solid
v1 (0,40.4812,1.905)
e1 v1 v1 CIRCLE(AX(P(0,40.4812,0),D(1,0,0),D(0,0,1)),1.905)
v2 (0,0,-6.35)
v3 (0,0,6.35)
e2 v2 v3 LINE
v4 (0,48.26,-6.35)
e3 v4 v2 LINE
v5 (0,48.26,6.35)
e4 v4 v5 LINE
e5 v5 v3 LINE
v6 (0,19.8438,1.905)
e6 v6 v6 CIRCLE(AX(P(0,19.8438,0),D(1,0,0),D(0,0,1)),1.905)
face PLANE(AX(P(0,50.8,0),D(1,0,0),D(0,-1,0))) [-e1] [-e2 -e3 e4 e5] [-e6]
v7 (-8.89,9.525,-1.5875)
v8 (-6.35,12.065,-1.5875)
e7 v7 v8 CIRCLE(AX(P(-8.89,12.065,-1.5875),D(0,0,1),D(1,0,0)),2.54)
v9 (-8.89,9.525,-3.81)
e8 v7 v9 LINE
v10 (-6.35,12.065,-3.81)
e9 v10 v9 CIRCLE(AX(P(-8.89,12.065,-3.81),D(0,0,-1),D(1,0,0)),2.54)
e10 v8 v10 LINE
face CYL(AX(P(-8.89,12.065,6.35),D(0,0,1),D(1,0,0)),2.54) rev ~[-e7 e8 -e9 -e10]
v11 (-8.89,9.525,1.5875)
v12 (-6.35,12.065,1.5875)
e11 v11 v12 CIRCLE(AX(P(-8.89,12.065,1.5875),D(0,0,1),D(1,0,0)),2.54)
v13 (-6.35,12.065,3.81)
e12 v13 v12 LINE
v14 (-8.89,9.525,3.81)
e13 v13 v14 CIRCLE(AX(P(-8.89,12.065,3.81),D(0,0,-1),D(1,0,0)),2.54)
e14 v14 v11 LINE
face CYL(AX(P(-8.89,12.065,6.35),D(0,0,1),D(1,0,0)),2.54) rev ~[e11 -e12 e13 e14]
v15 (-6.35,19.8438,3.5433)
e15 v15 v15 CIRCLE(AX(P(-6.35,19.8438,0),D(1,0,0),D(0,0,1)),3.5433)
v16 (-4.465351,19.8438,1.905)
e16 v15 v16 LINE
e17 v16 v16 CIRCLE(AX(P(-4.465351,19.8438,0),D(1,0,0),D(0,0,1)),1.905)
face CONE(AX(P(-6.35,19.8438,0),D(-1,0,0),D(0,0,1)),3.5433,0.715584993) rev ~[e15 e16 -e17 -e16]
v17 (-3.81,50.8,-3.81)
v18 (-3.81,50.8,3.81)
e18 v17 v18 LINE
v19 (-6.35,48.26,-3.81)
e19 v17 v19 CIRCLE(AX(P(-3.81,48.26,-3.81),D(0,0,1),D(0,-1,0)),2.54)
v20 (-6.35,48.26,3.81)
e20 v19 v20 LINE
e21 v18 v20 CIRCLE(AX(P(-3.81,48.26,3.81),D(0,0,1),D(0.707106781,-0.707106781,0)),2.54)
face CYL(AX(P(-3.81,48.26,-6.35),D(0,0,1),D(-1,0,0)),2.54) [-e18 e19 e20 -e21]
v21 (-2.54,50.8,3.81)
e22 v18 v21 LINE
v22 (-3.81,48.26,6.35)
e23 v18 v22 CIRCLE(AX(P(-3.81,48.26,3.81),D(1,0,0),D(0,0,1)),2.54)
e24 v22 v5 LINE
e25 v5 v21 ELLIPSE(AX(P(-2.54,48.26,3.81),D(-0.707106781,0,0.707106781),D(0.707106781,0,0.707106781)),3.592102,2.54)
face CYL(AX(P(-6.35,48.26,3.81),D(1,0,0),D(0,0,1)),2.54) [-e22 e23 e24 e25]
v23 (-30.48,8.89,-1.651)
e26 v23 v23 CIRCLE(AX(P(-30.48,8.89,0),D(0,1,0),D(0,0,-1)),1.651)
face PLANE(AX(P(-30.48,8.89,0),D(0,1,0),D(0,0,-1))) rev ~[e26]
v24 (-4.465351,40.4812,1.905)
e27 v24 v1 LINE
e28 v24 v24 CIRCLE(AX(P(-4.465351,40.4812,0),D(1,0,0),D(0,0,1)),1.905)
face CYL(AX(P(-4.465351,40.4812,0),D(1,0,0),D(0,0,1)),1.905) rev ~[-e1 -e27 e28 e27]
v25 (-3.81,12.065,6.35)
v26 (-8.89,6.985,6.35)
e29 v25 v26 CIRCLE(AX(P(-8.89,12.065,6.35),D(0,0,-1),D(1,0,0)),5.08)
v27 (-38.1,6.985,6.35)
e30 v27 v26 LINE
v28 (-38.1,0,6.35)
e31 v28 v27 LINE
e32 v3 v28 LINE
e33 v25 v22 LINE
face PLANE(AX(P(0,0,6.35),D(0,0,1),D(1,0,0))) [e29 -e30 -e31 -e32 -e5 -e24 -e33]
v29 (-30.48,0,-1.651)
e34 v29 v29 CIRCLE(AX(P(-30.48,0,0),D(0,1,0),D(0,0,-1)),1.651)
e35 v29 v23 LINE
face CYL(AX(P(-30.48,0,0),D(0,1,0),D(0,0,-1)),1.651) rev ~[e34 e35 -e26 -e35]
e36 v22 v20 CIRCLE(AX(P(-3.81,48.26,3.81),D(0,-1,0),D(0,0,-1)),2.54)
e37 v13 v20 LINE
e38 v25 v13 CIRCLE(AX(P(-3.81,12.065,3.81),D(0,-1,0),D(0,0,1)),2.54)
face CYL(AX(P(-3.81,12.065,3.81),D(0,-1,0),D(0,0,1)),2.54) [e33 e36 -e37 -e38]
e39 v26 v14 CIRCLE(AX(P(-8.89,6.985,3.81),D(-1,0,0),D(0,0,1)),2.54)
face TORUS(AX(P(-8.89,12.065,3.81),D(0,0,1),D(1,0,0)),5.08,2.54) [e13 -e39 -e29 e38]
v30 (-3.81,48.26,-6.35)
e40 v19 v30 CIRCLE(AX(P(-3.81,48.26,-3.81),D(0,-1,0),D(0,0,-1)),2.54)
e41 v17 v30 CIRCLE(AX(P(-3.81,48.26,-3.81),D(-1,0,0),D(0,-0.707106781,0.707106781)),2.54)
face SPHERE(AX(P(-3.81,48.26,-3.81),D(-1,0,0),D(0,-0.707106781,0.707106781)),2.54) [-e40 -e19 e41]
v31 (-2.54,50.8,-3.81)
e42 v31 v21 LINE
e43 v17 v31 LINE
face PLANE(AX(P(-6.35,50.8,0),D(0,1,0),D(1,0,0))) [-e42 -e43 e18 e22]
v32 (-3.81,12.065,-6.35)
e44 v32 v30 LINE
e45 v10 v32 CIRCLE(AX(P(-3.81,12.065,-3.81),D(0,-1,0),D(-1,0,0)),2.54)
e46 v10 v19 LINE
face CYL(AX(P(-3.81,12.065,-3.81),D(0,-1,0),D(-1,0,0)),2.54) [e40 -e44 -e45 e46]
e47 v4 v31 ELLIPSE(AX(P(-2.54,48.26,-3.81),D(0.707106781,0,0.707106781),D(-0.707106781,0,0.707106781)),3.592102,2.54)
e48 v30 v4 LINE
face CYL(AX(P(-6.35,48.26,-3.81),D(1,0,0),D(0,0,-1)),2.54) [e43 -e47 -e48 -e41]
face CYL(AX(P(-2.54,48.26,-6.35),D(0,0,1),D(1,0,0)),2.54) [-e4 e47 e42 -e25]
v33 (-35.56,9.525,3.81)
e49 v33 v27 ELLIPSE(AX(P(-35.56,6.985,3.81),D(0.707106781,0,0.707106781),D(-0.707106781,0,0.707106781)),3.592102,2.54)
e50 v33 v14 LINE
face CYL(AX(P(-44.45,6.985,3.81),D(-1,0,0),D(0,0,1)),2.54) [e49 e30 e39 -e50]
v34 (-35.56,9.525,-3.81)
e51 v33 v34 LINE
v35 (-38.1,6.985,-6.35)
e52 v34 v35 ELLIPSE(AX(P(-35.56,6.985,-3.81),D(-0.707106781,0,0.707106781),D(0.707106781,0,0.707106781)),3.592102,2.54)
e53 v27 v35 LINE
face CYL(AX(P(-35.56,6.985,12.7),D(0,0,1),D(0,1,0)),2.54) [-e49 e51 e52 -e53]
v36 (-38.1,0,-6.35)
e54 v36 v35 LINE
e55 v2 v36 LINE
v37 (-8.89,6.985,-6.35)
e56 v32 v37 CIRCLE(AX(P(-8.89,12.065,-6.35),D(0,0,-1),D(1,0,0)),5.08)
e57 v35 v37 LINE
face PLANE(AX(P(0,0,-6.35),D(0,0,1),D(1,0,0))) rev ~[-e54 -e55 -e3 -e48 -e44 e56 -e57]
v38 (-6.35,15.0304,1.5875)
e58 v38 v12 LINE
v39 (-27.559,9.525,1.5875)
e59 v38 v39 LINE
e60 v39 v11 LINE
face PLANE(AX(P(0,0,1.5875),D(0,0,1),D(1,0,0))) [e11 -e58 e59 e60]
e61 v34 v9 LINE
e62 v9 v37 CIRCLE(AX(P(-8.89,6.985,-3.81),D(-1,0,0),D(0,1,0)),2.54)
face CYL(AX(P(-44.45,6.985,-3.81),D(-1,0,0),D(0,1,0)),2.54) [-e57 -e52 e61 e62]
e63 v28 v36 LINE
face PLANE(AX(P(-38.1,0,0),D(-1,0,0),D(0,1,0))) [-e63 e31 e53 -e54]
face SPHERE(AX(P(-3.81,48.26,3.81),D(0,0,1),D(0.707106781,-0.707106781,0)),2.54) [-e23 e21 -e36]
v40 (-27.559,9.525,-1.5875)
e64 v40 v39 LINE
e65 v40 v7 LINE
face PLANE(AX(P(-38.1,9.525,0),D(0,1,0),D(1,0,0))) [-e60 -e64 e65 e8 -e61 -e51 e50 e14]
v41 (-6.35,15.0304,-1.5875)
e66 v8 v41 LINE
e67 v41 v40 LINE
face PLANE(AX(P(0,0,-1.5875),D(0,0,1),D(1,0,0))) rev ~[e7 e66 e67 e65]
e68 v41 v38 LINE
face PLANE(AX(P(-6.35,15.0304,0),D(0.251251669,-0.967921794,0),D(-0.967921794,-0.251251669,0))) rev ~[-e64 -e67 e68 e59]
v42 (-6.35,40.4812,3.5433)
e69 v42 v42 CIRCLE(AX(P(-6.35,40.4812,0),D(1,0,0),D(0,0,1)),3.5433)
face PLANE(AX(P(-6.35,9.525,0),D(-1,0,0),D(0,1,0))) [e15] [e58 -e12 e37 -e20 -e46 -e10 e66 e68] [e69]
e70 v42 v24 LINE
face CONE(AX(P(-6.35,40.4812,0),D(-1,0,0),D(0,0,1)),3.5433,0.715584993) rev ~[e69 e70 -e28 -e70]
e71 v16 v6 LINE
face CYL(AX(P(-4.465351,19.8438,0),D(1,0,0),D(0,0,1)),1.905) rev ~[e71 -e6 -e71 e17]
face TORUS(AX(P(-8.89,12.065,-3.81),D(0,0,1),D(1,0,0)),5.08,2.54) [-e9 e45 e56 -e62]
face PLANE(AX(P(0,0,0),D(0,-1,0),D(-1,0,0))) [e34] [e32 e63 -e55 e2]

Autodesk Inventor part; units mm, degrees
ref_plane "YZ Plane" through (0, 0, 0) normal (1, 0, 0) x (0, 1, 0)
ref_plane "XZ Plane" through (0, 0, 0) normal (0, 1, 0) x (-1, 0, 0)
ref_plane "XY Plane" through (0, 0, 0) normal (0, 0, 1) x (1, 0, 0)
sketch "Sketch1" plane through (0, 0, 0) normal (0, 0, 1) x (1, 0, 0)
  line L0 (0, 0) -> (-38.1, 0)
  line L1 (-38.1, 0) -> (-38.1, 9.525)
  line L2 (-38.1, 9.525) -> (-6.35, 9.525)
  line L3 (-6.35, 9.525) -> (-6.35, 50.8)
  line L4 (-6.35, 50.8) -> (0, 50.8)
  line L5 (0, 50.8) -> (0, 0)
  dimension "d0" = 38.1
  dimension "d1" = 9.525
  dimension "d2" = 50.8
  dimension "d3" = 6.35
extrude "Extrusion1" add sketch "Sketch1" along normal mid plane 12.7
sketch "Sketch2" plane through (-6.35, 9.525, 6.35) normal (-1, 0, 0) x (0, 0, 1)
  line L0 (-12.7, 41.275) -> (0, 41.275) construction
  line L1 (-6.35, 41.275) -> (-6.35, 0) construction
  line L2 (-12.7, 0) -> (0, 0) construction
  point P0 (-6.35, -9.525)
  point P1 (-6.35, 30.9563)
  point P2 (-6.35, 10.3188)
  dimension "d6" = 10.3187
  dimension "d7" = 10.3187
hole "Hole1" at (-6.35, 40.4812, 0) at (-6.35, 19.8438, 0) direction (1, 0, 0) diameter 3.81 end through all countersink diameter 7.0866 countersink angle 82 clearance for "Flat Head Machine Screw (82)" size "#6" standard "Ansi Unified Screw Threads"
sketch "Sketch3" plane through (-38.1, 0, 6.35) normal (0, -1, 0) x (1, 0, 0)
  line L0 (38.1, -6.35) -> (0, -6.35) construction
  line L1 (0, -12.7) -> (0, 0) construction
  line L2 (38.1, -12.7) -> (38.1, 0) projected
  point P0 (7.62, -6.35)
  dimension "d15" = 30.48
hole "Hole2" at (-30.48, 0, 0) direction (0, 1, 0) diameter 3.302 depth 8.89 thread size "8-32 UNC" class "2B" standard "ANSI Unified Screw Threads"
fillet "FilletForTop" radius 2.54 4 edges at (-6.35, 50.8, 0) (-3.175, 50.8, 6.35) (0, 50.8, 0) (-3.175, 50.8, -6.35)
fillet "FilletForFront" radius 2.54 8 edges at (-5.6061, 50.0561, -5.6061) (-6.35, 28.8925, -6.35) (-5.6061, 50.0561, 5.6061) (-6.35, 28.8925, 6.35) (-6.35, 9.525, 0) (-38.1, 9.525, 0) (-22.225, 9.525, 6.35) (-22.225, 9.525, -6.35)
sketch "Sketch4" plane through (0, 0, 0) normal (0, 0, 1) x (1, 0, 0)
  line L0 (-6.35, 48.26) -> (-6.35, 12.065) projected
  line L1 (-8.89, 9.525) -> (-35.56, 9.525) projected
  line L2 (-6.35, 15.0304) -> (-27.559, 9.525)
  line L3 (-4.4654, 17.9387) -> (-6.35, 16.3004) projected
  line L4 (-28.829, 8.89) -> (-28.829, 0) projected
  line L5 (-6.35, 15.0304) -> (-6.35, 9.525)
  line L6 (-6.35, 9.525) -> (-27.559, 9.525)
  point P0 (0, 0)
  point P1 (-6.35, 12.065)
  dimension "d26" = 1.27
  dimension "d27" = 1.27
extrude "Extrusion2" add sketch "Sketch4" along normal mid plane 3.175
equation "\"d0\" = distanceFromWall"
equation "\"d1\" = baseThickness"
equation "\"d2\" = wallHeight"
equation "\"d3\" = wallThickness"
equation "\"d4\" = width"
equation "\"d6\" = wallHoleCentersDistanceFromEnd"
equation "\"d7\" = wallHoleCentersDistanceFromEnd"
equation "\"d15\" = lightHoleDistanceFromWall"
equation "\"d28\" = 0.25 * width"
equation "\"baseThickness\" = 9.525"
equation "\"wallThickness\" = 6.35"
equation "\"distanceFromWall\" = 38.1"
equation "\"wallHeight\" = 50.8"
equation "\"width\" = 12.7"
equation "\"baseHeight\" = wallHeight - baseThickness"
equation "\"wallHoleCentersDistanceFromEnd\" = 0.25 * baseHeight"
equation "\"lightHoleDistanceFromWall\" = 30.48"
equation "\"screwDepth\" = 7.62"
properties part number "LightLBracket" material "PC/ABS Plastic"
